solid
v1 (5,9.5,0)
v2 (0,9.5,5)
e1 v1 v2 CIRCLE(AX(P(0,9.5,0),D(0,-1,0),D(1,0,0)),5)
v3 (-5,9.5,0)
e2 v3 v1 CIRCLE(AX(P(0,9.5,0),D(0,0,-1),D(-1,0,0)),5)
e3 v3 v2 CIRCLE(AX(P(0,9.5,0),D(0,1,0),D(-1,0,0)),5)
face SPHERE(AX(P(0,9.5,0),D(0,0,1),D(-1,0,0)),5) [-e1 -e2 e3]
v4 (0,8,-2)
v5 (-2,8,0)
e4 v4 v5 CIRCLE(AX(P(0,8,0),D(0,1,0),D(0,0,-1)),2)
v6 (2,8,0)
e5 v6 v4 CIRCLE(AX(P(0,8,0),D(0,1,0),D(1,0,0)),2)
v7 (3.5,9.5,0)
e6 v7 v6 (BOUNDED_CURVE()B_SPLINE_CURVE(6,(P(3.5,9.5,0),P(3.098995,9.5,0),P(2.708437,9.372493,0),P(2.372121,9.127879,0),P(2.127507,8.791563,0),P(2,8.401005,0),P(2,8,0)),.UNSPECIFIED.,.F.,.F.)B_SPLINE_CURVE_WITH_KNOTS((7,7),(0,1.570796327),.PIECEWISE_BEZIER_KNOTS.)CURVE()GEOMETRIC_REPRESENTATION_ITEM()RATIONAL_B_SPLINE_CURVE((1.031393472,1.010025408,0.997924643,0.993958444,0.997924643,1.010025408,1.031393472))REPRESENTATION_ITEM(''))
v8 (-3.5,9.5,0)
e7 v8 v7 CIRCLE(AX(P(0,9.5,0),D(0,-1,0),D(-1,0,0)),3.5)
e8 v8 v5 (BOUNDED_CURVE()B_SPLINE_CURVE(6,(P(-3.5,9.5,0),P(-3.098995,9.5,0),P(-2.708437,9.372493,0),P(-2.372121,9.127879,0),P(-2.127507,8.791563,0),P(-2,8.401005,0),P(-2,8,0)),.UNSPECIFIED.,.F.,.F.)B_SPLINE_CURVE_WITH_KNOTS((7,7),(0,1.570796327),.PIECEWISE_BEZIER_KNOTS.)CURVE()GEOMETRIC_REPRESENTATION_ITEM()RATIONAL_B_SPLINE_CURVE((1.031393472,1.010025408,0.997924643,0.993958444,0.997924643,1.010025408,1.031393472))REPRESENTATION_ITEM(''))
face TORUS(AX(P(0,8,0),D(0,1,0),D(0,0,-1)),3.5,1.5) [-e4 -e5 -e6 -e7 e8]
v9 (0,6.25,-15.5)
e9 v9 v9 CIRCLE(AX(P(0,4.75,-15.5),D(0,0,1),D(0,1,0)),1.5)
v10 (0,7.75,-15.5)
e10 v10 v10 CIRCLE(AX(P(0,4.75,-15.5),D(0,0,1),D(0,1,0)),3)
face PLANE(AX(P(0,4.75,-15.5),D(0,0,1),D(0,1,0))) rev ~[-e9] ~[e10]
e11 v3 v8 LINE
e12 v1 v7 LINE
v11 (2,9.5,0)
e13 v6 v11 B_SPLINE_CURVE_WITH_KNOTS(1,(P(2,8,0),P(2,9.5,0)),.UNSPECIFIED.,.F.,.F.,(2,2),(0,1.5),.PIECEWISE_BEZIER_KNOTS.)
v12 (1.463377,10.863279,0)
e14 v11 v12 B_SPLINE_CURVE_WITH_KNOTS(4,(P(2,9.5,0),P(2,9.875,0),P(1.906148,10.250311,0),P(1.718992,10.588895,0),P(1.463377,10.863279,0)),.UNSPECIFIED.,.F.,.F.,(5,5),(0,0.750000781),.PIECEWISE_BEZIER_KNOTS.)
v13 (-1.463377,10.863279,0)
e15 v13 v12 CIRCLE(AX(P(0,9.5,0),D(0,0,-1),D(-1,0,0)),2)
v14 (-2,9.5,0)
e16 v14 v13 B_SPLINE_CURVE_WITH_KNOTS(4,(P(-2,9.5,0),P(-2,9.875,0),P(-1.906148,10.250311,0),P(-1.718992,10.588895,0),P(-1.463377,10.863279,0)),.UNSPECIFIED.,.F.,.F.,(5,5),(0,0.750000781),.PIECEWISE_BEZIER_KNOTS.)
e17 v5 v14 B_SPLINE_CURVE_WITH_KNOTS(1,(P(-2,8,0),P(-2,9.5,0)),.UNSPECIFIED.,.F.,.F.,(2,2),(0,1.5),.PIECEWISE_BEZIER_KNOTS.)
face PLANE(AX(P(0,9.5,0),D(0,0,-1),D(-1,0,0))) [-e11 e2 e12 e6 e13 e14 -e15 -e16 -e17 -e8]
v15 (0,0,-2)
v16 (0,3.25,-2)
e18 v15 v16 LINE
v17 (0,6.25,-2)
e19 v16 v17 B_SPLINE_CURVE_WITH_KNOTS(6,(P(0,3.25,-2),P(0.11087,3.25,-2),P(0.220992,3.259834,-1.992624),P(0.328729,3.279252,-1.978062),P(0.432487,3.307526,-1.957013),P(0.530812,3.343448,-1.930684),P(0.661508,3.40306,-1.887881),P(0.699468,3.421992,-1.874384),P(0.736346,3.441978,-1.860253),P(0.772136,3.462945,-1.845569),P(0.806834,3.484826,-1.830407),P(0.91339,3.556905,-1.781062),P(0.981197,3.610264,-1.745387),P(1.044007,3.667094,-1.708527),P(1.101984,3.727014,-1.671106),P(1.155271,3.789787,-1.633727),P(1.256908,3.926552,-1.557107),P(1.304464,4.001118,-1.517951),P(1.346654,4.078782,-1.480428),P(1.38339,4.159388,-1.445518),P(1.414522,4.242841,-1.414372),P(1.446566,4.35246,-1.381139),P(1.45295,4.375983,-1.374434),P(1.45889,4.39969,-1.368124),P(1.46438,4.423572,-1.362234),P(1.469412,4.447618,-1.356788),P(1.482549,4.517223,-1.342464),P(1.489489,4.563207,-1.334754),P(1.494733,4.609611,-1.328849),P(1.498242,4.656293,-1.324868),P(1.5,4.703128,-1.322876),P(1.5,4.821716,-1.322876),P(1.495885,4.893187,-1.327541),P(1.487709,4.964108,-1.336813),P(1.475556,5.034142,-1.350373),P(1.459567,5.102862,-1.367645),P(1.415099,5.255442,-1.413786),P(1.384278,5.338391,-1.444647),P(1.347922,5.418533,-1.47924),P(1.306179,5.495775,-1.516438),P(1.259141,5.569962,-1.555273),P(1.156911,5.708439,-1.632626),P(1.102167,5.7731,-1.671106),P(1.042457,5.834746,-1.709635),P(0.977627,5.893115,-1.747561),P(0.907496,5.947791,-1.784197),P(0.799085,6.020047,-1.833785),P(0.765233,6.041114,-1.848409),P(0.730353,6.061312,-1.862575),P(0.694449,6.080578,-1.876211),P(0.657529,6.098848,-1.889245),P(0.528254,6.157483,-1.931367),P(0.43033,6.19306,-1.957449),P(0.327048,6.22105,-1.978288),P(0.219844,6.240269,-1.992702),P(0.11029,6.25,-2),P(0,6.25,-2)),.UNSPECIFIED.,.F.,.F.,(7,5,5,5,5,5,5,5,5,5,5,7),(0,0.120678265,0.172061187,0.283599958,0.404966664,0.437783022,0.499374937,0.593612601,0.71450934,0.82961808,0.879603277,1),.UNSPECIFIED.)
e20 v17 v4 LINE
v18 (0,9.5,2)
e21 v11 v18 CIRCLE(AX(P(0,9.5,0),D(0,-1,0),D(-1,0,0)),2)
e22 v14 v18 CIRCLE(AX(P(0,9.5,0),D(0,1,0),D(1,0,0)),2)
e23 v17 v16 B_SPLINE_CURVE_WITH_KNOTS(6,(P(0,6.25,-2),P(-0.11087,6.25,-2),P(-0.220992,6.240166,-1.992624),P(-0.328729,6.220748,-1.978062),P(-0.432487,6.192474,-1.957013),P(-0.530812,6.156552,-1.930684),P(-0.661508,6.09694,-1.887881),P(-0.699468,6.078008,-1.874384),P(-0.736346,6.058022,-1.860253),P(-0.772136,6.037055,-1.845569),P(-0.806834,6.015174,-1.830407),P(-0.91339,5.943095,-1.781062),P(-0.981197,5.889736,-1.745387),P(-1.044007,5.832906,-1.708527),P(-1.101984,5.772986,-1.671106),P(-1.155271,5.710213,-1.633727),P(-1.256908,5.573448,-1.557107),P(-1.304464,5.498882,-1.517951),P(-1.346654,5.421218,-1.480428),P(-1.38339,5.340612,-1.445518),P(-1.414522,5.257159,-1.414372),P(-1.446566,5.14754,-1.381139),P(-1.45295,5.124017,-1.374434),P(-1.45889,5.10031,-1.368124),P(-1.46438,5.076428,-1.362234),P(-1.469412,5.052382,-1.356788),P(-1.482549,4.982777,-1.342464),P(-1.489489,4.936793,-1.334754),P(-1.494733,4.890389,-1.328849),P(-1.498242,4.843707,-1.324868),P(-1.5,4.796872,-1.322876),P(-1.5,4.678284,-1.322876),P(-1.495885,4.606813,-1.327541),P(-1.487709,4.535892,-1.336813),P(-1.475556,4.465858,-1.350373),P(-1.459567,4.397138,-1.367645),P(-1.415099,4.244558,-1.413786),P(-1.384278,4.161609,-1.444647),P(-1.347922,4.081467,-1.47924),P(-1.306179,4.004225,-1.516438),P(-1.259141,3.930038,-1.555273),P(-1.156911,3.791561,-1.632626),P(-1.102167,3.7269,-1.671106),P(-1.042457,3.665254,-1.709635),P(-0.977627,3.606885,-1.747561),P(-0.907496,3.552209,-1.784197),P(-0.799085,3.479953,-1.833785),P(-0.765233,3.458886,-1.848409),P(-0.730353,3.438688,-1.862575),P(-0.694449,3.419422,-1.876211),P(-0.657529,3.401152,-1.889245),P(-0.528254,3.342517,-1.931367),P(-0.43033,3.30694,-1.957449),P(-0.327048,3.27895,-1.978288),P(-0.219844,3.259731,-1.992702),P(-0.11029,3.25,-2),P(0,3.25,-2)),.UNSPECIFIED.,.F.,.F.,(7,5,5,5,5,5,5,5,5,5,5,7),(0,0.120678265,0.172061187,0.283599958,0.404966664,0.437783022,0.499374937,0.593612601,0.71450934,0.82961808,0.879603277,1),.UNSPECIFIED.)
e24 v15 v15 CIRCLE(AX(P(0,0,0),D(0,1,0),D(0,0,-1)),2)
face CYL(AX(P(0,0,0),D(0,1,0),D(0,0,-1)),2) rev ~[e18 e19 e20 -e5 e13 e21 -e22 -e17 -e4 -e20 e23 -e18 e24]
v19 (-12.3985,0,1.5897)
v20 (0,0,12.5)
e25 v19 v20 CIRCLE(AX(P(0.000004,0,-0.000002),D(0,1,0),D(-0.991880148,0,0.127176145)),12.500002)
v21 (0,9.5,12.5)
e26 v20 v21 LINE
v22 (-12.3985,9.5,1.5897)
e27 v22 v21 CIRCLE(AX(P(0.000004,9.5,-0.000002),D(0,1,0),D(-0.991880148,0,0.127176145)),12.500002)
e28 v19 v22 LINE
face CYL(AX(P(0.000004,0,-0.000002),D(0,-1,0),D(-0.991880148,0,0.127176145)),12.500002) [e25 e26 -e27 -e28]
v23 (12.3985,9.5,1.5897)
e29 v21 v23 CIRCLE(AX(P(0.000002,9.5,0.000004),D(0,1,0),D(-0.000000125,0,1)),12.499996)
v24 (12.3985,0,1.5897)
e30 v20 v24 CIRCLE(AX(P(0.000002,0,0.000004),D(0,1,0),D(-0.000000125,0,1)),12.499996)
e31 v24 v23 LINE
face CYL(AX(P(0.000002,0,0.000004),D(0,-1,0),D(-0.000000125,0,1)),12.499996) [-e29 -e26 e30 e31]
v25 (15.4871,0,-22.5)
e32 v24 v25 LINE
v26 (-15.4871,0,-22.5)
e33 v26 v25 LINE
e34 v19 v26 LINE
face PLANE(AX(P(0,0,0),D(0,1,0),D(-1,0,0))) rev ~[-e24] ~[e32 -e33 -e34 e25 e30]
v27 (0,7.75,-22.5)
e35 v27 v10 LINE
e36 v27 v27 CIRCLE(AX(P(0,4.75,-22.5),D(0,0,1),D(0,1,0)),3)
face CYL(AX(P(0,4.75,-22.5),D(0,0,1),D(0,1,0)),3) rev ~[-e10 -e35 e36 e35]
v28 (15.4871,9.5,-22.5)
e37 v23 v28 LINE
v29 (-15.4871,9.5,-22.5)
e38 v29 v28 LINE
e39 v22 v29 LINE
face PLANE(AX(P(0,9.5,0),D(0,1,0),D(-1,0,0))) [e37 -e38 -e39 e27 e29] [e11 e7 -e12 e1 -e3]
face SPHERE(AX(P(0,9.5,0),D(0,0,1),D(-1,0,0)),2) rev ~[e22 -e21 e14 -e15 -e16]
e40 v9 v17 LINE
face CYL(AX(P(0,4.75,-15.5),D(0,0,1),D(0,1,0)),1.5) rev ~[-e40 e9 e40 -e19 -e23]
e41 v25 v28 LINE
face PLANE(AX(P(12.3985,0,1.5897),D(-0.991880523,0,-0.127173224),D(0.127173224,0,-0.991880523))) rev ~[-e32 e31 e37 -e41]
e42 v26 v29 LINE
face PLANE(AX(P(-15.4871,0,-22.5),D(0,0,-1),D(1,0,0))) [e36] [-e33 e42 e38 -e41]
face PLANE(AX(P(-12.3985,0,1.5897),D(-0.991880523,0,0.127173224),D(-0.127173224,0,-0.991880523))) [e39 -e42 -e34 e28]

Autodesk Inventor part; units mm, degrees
ref_plane "YZ Plane" through (0, 0, 0) normal (1, 0, 0) x (0, 1, 0)
ref_plane "XZ Plane" through (0, 0, 0) normal (0, 1, 0) x (-1, 0, 0)
ref_plane "XY Plane" through (0, 0, 0) normal (0, 0, 1) x (1, 0, 0)
sketch "Skizze1" plane through (0, 0, 0) normal (0, 1, 0) x (-1, 0, 0)
  arc A0 (12.3985, 1.5897) -> (0, 12.5) centre (0, 0) ccw
  line L0 (0, -34.7678) -> (0, 23.1071) construction
  line L1 (12.3985, 1.5897) -> (16, -26.5)
  line L2 (16, -26.5) -> (0, -26.5)
  arc A1 (0, 12.5) -> (-12.3985, 1.5897) centre (0, 0) ccw
  line L3 (-12.3985, 1.5897) -> (-16, -26.5)
  line L4 (-16, -26.5) -> (0, -26.5)
  line L5 (15.4871, -22.5) -> (-15.4871, -22.5)
  dimension "d0" = 25
  dimension "d1" = 32
  dimension "d2" = 39
  dimension "d3" = 35
extrude "Extrusion1" add sketch "Skizze1" along normal blind 9.5 contours L1 L5 L3 A1 A0
hole "Bohrung1" at (0, 0, 0) direction (0, 1, 0) diameter 4 depth 9.5
sketch "Skizze2" plane through (0, 9.5, 0) normal (0, 1, 0) x (1, 0, 0)
  line L0 (0, 29.5) -> (0, -19.5) projected
  arc A0 (-5, 0) -> (0, -5) centre (0, 0) ccw
  line L1 (-21.682, 0) -> (21.682, 0) projected
  circle A1 centre (0, 0) radius 2 projected
  line L2 (0, -5) -> (0, -2)
  line L3 (-2, 0) -> (-5, 0)
  point P0 (0, 5)
  dimension "d6" = 10
revolve "Umdrehung1" add sketch "Skizze2" angle 180 about axis through (0, 9.5, 0) along (0, 0, -1) contours L0 A0 L1 A1
fillet "Rundung1" radius 1.5 4 edges at (-1.4142, 9.5, -1.4142) (1.4142, 9.5, -1.4142) (-1.4142, 9.5, 1.4142) (1.4142, 9.5, 1.4142)
sketch "Skizze3" plane through (15.4871, 0, -22.5) normal (0, 0, -1) x (-1, 0, 0)
  line L0 (0, 0) -> (30.9743, 0) projected
  line L1 (30.9743, 0) -> (30.9743, 9.5) projected
  line L2 (0, 9.5) -> (30.9743, 9.5) projected
  line L3 (0, 0) -> (0, 9.5) projected
  line L4 (3.0886, 9.5) -> (0, 9.5) projected
  line L5 (0, 9.5) -> (30.9743, 0) construction
  line L6 (30.9743, 9.5) -> (0, 0) construction
  point P0 (15.4871, 0)
  point P1 (15.4871, 4.75)
hole "Bohrung2" at (0, 4.75, -22.5) direction (0, 0, 1) diameter 3 end up to surface counterbore diameter 6 counterbore depth 7
properties part number "Steitenteil_kabel"
